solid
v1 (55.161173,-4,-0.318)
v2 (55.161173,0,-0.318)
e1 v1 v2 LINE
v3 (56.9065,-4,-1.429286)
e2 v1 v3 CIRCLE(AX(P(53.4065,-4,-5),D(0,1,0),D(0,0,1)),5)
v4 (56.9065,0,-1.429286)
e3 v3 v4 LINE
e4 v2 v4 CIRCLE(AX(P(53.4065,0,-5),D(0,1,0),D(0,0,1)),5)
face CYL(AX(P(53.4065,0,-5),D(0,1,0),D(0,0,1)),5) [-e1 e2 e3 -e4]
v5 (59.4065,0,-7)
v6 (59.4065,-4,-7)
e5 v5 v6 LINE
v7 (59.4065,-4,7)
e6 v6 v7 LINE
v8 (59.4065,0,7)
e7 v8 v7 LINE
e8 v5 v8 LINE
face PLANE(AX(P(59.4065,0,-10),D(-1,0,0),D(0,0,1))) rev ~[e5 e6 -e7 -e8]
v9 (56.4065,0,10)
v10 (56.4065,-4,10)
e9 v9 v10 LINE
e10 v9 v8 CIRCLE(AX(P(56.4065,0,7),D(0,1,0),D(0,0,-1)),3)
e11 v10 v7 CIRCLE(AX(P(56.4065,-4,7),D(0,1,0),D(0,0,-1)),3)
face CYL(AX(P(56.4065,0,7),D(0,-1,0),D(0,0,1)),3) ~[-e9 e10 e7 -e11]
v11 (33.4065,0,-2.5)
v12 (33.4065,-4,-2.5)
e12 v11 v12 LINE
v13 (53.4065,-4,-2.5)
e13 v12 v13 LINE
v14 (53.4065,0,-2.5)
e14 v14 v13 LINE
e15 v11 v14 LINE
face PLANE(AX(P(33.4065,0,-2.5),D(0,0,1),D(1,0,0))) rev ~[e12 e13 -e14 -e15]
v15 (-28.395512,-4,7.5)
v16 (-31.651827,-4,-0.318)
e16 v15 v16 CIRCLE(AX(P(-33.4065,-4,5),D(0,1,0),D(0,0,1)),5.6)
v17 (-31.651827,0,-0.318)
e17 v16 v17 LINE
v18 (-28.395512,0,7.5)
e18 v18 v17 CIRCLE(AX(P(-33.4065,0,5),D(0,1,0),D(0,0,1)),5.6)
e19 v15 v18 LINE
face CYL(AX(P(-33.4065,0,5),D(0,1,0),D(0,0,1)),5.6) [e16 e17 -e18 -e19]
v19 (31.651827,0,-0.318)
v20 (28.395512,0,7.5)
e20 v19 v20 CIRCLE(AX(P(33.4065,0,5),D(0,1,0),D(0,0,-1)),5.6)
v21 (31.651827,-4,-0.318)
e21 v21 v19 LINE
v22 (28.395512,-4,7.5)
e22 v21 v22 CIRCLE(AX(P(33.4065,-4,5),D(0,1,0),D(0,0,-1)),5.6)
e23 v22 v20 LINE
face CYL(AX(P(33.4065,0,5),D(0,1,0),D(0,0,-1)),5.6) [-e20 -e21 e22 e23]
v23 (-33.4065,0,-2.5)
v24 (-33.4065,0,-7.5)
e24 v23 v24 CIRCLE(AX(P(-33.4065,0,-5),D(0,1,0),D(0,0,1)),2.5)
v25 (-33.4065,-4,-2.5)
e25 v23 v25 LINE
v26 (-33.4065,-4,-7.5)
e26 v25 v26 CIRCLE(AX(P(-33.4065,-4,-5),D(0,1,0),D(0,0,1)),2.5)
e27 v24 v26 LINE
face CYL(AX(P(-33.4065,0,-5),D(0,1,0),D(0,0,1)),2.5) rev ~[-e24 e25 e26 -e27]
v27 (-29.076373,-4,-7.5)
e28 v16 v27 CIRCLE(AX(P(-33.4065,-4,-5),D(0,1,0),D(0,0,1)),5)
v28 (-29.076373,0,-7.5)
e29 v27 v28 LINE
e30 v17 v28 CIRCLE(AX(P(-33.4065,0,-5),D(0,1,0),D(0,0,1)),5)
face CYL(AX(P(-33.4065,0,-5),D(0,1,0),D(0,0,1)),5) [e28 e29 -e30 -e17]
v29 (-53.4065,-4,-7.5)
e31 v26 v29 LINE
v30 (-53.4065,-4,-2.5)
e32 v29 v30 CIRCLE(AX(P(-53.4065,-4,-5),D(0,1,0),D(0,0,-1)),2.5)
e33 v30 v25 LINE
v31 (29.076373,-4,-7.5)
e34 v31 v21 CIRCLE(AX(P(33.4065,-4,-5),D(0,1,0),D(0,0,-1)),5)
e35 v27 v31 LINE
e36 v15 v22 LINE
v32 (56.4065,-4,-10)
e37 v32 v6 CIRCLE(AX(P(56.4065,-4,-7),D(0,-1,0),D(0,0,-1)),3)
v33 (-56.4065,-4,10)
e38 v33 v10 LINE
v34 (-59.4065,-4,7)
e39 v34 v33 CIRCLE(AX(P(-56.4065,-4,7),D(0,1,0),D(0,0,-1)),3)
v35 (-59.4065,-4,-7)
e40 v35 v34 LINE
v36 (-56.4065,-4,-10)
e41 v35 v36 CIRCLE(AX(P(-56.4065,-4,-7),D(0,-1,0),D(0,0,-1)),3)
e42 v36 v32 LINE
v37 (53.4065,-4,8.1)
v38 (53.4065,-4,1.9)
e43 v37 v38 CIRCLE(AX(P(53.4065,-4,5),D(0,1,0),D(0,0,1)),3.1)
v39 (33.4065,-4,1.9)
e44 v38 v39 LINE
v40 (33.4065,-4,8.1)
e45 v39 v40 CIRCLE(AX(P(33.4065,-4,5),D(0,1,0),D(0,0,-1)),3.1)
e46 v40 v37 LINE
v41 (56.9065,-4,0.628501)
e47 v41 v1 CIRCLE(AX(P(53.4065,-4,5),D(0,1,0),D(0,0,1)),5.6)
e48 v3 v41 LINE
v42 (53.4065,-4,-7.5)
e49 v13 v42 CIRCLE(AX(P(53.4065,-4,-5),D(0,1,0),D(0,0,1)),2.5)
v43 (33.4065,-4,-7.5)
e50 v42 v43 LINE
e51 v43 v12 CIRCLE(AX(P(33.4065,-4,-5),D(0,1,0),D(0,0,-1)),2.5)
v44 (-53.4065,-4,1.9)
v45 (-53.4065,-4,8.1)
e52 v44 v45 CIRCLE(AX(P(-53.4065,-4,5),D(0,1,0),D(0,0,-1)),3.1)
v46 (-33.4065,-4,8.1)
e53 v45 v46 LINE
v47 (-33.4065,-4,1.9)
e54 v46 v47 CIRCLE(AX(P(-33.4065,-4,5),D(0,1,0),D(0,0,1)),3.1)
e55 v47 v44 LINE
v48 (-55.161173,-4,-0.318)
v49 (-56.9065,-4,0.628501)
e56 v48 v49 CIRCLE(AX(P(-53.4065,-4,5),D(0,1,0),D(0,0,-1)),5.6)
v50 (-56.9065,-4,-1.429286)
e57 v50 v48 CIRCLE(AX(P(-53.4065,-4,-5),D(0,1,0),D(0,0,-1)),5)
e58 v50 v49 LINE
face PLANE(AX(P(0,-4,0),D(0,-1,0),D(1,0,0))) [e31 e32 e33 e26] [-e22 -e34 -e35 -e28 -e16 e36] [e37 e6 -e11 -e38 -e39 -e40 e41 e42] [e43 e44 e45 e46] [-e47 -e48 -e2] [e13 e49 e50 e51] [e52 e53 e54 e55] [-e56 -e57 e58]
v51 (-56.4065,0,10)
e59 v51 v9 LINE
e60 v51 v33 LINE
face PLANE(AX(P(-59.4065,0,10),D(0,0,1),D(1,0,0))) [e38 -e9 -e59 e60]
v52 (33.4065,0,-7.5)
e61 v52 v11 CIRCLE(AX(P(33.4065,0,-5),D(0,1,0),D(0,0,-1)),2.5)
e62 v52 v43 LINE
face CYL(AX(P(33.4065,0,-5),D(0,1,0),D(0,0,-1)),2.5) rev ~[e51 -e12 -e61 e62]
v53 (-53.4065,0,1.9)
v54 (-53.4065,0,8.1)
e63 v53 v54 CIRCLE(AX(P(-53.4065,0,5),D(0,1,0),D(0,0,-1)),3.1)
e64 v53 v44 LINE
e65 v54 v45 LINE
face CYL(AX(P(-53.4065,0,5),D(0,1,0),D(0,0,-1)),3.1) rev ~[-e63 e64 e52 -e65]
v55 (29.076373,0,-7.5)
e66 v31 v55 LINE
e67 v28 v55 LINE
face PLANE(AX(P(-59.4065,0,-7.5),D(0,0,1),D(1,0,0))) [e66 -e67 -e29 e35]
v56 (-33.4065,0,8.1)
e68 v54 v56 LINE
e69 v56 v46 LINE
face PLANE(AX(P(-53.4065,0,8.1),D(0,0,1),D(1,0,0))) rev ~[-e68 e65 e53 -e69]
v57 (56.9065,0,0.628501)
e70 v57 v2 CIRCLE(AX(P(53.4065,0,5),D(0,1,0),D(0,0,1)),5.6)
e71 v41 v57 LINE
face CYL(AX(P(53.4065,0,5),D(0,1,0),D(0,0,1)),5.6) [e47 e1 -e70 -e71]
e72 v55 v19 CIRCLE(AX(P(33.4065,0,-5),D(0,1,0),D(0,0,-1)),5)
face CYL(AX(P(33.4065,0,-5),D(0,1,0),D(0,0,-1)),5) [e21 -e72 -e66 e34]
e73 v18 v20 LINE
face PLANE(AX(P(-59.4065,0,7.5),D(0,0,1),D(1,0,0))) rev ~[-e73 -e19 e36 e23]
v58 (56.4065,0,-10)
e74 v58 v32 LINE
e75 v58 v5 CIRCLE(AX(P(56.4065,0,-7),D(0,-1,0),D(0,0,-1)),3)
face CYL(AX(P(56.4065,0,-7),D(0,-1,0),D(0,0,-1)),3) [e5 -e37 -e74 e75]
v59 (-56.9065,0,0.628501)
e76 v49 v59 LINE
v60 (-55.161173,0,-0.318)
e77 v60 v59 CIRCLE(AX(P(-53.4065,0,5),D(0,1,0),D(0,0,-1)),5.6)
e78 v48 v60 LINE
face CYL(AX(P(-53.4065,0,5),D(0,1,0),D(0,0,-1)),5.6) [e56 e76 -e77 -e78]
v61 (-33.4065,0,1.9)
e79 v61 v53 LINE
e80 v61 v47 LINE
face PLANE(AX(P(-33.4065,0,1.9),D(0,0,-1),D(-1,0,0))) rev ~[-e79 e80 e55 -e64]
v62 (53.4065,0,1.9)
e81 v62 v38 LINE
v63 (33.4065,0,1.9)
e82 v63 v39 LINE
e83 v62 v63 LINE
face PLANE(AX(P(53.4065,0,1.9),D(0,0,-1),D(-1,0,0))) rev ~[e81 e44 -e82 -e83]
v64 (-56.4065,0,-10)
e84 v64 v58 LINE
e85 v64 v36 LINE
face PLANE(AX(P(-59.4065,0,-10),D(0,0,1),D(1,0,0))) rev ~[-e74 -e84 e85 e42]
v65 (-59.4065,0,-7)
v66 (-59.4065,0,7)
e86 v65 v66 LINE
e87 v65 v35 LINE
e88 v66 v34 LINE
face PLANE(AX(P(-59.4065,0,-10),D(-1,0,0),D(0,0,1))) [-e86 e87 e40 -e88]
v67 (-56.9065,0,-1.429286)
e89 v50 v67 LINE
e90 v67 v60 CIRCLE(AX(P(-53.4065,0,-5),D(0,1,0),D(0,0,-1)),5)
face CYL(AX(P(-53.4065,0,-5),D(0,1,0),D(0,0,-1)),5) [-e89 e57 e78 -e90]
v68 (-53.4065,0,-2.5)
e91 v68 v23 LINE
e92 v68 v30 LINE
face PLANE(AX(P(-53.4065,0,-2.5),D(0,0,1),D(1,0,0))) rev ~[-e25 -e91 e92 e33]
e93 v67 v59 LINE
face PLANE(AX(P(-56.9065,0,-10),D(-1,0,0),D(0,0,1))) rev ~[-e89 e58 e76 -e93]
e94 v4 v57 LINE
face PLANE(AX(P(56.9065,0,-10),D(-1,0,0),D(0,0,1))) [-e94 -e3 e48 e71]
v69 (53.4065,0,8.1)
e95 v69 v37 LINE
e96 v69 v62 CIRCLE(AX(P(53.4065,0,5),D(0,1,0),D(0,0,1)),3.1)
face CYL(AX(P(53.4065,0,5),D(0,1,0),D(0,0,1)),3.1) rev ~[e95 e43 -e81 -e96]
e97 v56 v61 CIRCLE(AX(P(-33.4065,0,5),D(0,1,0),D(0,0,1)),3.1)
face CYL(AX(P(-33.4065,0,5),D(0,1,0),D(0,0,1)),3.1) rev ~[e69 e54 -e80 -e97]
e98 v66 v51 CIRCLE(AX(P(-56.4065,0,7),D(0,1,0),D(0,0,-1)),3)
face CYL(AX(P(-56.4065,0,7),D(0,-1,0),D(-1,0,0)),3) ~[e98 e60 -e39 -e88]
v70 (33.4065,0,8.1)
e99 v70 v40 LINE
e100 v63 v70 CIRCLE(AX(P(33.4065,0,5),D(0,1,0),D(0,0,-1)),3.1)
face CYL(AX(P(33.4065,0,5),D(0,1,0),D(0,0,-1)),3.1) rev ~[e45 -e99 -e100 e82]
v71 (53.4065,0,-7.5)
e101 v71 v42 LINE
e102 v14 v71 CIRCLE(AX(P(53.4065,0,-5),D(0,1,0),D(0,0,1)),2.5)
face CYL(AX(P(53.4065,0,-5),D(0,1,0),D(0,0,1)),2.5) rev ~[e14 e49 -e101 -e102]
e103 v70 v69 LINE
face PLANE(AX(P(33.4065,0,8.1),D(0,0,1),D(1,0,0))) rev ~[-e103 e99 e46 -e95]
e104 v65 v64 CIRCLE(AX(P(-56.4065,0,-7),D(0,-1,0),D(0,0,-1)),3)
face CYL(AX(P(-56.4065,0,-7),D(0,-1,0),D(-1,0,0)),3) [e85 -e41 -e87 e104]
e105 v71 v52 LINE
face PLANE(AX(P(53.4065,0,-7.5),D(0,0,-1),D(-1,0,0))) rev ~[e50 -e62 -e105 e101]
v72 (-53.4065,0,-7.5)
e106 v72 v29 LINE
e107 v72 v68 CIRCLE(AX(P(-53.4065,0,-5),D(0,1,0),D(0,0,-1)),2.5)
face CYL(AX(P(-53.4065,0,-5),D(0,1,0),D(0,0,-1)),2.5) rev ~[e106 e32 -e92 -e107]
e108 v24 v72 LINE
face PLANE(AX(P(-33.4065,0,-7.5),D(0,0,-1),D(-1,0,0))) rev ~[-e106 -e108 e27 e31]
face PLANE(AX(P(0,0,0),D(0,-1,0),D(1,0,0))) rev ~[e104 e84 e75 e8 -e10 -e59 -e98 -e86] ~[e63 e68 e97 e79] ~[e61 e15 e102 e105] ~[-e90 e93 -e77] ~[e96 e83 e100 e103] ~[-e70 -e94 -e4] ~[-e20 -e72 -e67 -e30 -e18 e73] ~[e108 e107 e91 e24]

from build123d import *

# Parameters (mm, degrees)
F0_W     = 118.813
F0_H     = 20
F1_DEPTH = 4
F2_T     = 2.5
F3_R     = 3


# Not quite as in the source:
# - a shell that OpenCascade refuses in one call is made with other operations: the cavity is built on its own and cut out


with BuildPart() as f1:
    # F0 (on Front) → F1 (new body)
    with BuildSketch(Plane.XZ):
        Rectangle(F0_W, F0_H)
        with BuildLine():
            Line((-33.4065, -7.5), (-53.4065, -7.5))
            ThreePointArc((-53.4065, -7.5), (-55.9065, -5), (-53.4065, -2.5))
            Line((-53.4065, -2.5), (-33.4065, -2.5))
            ThreePointArc((-33.4065, -2.5), (-30.9065, -5), (-33.4065, -7.5))
        make_face(mode=Mode.SUBTRACT)
        with BuildLine():
            Line((53.4065, -7.5), (33.4065, -7.5))
            ThreePointArc((33.4065, -7.5), (30.9065, -5), (33.4065, -2.5))
            Line((33.4065, -2.5), (53.4065, -2.5))
            ThreePointArc((53.4065, -2.5), (55.9065, -5), (53.4065, -7.5))
        make_face(mode=Mode.SUBTRACT)
        with BuildLine():
            Line((-33.4065, 1.9), (-53.4065, 1.9))
            ThreePointArc((-53.4065, 1.9), (-56.5065, 5), (-53.4065, 8.1))
            Line((-53.4065, 8.1), (-33.4065, 8.1))
            ThreePointArc((-33.4065, 8.1), (-30.3065, 5), (-33.4065, 1.9))
        make_face(mode=Mode.SUBTRACT)
        with BuildLine():
            Line((53.4065, 1.9), (33.4065, 1.9))
            ThreePointArc((33.4065, 1.9), (30.3065, 5), (33.4065, 8.1))
            Line((33.4065, 8.1), (53.4065, 8.1))
            ThreePointArc((53.4065, 8.1), (56.5065, 5), (53.4065, 1.9))
        make_face(mode=Mode.SUBTRACT)
    extrude(amount=F1_DEPTH)

    # F2: shell of thickness 2.5, made by hand


with BuildPart() as f2_core1:
    # F2_t2: copy of F1
    add(f1.part)

    # the walls: a layer under each face that stays
    f2_faces = [f2_core1.faces().sort_by_distance(p)[0] for p in [
        (59.4065, -2, 0),
        (0, -2, 10),
        (-59.4065, -2, 0),
        (0, -2, -10),
        (-43.4065, -2, -7.5),
        (-55.9065, -2, -5),
        (-43.4065, -2, -2.5),
        (-30.9065, -2, -5),
        (43.4065, -2, -7.5),
        (30.9065, -2, -5),
        (43.4065, -2, -2.5),
        (55.9065, -2, -5),
        (-43.4065, -2, 8.1),
        (-30.3065, -2, 5),
        (-43.4065, -2, 1.9),
        (-56.5065, -2, 5),
        (43.4065, -2, 1.9),
        (30.3065, -2, 5),
        (43.4065, -2, 8.1),
        (56.5065, -2, 5),
    ]]
    thicken(f2_faces, amount=-F2_T, mode=Mode.SUBTRACT)


with BuildPart() as f1_1:
    add(f1.part)

    # what is left inside the walls is the cavity
    f2_cavity = [f2_core1.part.solids().sort_by_distance(p)[0] for p in [
        (56.105376, -2.666667, -0.761286),
        (0, -0.025, -2.5),
        (-56.105376, -2.666667, -0.761286),
    ]]
    add(f2_cavity, mode=Mode.SUBTRACT)

    # F3
    f3_edges = [f1_1.edges().sort_by_distance(p)[0] for p in [
        (59.4065, -2, -10),
        (59.4065, -2, 10),
        (-59.4065, -2, -10),
        (-59.4065, -2, 10),
    ]]
    fillet(f3_edges, radius=F3_R)


solid = f1_1.part
